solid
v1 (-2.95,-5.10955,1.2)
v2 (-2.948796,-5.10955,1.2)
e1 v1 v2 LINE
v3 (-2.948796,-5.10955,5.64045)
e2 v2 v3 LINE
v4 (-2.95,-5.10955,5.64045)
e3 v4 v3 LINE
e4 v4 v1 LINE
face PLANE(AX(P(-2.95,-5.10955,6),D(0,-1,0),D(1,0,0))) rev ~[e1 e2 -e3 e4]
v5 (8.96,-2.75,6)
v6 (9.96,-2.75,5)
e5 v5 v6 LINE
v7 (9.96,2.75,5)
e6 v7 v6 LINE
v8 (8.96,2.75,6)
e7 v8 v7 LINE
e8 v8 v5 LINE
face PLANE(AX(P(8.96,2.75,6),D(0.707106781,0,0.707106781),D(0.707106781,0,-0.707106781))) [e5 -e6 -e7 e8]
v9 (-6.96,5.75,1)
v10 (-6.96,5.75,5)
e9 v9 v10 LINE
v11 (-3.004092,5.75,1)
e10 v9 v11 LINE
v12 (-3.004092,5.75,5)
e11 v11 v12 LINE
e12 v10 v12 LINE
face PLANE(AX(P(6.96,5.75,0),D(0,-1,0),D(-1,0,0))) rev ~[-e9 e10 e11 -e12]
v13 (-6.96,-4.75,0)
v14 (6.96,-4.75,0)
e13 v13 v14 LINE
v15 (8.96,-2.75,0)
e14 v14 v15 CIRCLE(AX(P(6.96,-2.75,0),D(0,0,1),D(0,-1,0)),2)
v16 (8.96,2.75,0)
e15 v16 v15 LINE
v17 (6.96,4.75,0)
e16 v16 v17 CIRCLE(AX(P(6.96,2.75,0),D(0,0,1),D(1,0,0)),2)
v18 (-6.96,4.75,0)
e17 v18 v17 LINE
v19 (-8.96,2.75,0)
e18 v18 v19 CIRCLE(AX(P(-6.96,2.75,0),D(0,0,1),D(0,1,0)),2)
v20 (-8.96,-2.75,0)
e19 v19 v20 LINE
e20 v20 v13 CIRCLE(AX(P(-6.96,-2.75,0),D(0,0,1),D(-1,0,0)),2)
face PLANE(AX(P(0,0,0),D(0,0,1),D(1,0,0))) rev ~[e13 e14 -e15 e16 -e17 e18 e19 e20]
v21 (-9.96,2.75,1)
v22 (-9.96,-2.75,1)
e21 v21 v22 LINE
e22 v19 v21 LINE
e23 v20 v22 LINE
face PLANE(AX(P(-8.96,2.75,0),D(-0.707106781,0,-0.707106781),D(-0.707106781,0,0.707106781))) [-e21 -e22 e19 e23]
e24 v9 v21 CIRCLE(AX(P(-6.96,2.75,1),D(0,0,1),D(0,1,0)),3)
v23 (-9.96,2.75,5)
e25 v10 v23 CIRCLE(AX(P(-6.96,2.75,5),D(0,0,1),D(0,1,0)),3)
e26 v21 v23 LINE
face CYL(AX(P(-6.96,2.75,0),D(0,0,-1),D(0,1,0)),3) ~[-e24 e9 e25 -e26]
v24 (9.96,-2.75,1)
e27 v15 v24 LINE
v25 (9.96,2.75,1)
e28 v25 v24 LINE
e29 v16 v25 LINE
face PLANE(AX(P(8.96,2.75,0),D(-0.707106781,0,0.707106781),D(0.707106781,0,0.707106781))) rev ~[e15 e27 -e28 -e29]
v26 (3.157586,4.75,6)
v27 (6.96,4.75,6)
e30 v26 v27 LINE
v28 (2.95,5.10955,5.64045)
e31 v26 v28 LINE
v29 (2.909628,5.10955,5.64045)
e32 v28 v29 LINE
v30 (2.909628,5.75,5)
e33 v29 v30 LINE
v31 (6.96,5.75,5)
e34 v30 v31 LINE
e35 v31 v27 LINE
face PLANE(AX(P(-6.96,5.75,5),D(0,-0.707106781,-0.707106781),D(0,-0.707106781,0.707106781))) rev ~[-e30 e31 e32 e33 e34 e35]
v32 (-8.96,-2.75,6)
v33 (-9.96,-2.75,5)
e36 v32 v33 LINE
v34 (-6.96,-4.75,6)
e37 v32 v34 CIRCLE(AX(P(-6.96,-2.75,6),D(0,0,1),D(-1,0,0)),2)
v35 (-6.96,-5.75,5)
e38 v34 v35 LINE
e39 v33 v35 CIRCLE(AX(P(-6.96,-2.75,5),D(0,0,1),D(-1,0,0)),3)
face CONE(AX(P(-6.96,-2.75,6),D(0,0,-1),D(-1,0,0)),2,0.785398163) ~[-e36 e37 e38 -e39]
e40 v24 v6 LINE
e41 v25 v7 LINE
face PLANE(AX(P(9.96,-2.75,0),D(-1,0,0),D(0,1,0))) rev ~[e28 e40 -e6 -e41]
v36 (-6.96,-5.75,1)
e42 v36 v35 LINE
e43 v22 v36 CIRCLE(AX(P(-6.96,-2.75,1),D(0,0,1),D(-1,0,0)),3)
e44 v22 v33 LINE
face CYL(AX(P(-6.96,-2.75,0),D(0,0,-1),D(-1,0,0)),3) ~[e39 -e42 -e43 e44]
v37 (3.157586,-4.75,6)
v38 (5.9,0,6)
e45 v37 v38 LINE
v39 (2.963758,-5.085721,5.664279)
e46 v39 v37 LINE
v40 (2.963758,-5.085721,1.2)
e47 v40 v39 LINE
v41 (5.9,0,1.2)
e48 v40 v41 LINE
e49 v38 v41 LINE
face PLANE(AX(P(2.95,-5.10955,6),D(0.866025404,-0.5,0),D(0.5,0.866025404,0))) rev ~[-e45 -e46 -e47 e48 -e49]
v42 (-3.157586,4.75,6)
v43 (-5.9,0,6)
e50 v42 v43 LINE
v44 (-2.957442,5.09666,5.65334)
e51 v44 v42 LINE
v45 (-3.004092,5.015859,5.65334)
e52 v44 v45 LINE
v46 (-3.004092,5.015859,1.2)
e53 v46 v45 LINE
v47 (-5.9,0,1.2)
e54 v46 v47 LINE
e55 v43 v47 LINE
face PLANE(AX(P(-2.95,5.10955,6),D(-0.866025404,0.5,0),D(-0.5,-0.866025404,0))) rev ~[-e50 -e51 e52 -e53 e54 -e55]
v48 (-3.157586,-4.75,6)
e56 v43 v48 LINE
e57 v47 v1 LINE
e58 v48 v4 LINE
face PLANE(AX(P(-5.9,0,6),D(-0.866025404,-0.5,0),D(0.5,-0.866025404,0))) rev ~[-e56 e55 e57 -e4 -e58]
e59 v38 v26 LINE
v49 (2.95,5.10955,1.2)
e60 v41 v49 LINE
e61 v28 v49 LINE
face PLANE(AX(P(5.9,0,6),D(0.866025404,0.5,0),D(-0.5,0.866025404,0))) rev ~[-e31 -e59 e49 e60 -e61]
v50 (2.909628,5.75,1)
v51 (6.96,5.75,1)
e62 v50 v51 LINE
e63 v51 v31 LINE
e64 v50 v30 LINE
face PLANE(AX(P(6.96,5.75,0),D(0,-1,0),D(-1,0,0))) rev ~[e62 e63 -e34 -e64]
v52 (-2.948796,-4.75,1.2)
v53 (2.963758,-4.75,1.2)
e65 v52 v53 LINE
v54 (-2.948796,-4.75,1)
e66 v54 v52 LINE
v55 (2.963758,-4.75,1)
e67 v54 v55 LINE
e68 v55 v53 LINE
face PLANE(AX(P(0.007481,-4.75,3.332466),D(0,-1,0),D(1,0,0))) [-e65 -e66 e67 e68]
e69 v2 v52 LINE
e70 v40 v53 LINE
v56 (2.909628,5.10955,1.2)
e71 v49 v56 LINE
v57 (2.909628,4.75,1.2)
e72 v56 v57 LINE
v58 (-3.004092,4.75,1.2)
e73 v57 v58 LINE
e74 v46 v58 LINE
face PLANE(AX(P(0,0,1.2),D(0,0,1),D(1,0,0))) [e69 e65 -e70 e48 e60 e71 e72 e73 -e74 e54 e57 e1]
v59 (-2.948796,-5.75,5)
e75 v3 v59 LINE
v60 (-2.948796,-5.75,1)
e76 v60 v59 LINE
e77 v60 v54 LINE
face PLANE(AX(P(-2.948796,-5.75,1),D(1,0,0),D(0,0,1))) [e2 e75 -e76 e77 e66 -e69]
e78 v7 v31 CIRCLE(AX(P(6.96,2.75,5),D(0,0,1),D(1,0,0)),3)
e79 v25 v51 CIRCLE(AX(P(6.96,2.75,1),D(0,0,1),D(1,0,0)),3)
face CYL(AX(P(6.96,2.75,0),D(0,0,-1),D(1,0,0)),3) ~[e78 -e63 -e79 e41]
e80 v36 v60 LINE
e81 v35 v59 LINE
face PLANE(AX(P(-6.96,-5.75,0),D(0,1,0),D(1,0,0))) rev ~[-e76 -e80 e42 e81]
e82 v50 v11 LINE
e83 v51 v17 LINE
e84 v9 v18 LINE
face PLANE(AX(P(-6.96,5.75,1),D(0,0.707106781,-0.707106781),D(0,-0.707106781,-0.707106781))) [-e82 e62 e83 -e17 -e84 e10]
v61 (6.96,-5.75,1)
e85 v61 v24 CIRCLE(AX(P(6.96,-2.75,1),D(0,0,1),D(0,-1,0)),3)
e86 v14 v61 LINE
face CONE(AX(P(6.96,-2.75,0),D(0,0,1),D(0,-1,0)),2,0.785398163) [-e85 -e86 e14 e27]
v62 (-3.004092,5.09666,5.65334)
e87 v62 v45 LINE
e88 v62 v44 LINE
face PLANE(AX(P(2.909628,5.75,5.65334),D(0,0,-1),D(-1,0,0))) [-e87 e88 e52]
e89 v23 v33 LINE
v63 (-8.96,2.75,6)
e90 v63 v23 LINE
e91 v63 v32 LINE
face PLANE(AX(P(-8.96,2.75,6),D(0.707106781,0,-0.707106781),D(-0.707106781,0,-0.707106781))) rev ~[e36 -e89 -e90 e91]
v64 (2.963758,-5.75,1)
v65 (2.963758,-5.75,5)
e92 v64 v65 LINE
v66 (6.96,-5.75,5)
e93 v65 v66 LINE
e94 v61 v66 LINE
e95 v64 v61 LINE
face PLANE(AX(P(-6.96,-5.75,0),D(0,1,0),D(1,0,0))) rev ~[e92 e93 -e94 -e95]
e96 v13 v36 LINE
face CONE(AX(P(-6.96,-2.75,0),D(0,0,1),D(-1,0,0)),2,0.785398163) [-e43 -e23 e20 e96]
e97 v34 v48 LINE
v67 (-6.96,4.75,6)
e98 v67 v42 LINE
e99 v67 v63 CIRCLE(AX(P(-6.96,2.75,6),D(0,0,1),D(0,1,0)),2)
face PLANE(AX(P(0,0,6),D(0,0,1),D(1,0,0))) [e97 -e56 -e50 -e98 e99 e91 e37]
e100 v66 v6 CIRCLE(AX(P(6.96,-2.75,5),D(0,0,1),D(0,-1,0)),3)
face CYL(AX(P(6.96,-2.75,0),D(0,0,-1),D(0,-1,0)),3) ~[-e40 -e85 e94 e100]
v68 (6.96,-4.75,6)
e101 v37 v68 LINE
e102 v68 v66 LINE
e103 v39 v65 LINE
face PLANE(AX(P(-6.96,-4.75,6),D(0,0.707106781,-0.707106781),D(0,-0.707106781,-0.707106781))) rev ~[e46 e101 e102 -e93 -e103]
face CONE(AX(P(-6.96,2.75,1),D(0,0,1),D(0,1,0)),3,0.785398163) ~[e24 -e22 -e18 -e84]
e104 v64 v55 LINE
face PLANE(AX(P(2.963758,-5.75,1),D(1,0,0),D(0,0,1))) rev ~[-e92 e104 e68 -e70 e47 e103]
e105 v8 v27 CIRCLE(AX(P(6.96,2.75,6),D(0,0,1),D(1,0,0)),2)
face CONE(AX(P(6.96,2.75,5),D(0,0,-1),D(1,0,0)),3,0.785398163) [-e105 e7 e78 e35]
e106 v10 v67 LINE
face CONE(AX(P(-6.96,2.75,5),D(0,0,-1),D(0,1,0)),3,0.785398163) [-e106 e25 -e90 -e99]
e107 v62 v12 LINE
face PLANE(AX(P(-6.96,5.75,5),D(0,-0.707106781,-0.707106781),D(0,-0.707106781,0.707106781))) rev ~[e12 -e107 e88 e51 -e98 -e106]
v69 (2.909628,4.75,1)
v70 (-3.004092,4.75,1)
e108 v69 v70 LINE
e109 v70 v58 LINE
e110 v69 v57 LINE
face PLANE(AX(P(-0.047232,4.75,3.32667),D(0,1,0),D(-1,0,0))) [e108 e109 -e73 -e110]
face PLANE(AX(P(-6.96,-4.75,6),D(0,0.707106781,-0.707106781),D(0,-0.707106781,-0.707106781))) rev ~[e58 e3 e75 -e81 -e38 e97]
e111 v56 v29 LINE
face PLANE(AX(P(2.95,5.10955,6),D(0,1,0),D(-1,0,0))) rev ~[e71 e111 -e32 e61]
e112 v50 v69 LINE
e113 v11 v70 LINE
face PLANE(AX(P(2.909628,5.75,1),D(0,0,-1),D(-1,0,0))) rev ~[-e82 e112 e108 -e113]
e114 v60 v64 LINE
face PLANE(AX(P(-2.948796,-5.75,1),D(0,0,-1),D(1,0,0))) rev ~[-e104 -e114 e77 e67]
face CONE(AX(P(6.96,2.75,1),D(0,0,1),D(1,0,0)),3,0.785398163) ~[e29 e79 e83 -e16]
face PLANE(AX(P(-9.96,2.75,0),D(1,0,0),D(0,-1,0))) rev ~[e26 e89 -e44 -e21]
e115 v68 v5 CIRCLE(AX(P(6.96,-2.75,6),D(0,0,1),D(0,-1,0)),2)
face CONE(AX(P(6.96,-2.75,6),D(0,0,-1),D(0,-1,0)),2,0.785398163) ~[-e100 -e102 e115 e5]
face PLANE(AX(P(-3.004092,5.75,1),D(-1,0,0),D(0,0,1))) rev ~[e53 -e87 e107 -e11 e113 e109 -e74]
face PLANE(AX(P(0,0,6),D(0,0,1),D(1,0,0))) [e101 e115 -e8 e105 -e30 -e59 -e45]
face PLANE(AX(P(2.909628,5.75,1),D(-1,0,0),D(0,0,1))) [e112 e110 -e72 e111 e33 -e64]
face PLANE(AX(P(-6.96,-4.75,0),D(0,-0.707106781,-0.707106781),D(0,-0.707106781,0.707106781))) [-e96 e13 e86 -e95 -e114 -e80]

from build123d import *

# Parameters (mm, degrees)
F1_DEPTH     = 6
F3_DEPTH     = 4.8
F4_T1_DEPTH  = 13.92
F4_T3_DEPTH  = 5.5
F4_T6_ANGLE  = 90
F4_T8_ANGLE  = 90
F4_T10_ANGLE = 90
F4_T12_ANGLE = 90
F4_T14_ANGLE = 90
F4_T16_ANGLE = 90
F4_T18_ANGLE = 90
F4_T20_ANGLE = 90
F5_W         = 5.9125532862
F5_H         = 4.6649316102
F6_DEPTH     = 1
F7_W         = 5.9137202334
F7_H         = 4.6533403695
F8_DEPTH     = 1


# Not quite as in the source:
# - a fillet or chamfer that OpenCascade refuses, or shapes differently, is made with other operations: its cross-section is extruded or revolved along the edge and cut away or added


with BuildPart() as f1:
    # F0 (on Top) → F1 (new body)
    with BuildSketch(Plane.XY):
        with BuildLine():
            Line((6.96, 5.75), (-6.96, 5.75))
            ThreePointArc((-6.96, 5.75), (-9.0813203436, 4.8713203436), (-9.96, 2.75))
            Line((-9.96, 2.75), (-9.96, -2.75))
            ThreePointArc((-9.96, -2.75), (-9.0813203436, -4.8713203436), (-6.96, -5.75))
            Line((-6.96, -5.75), (6.96, -5.75))
            ThreePointArc((6.96, -5.75), (9.0813203436, -4.8713203436), (9.96, -2.75))
            Line((9.96, -2.75), (9.96, 2.75))
            ThreePointArc((9.96, 2.75), (9.0813203436, 4.8713203436), (6.96, 5.75))
        make_face()
    extrude(amount=F1_DEPTH)

    # F2 (on face) → F3 (cut)
    with BuildSketch(Plane.XY.offset(6)):
        Polygon((2.95, 5.1095498823), (-2.95, 5.1095498823), (-5.9, 0), (-2.95, -5.1095498823), (2.95, -5.1095498823), (5.9, 0), align=None)
    extrude(amount=-F3_DEPTH, mode=Mode.SUBTRACT)

    # F4: chamfer of 1 on 2 edges, made by hand

    # F4_s2 → F4_t1 (cut)
    with BuildSketch(Plane.YZ.offset(-6.96)):
        Polygon((5.75, 5), (4.75, 6), (5.75, 6), align=None)
        Polygon((5.75, 1), (4.75, 0), (5.75, 0), align=None)
        Polygon((-4.75, 0), (-5.75, 1), (-5.75, 0), align=None)
        Polygon((-4.75, 6), (-5.75, 5), (-5.75, 6), align=None)
    extrude(amount=F4_T1_DEPTH, mode=Mode.SUBTRACT)

    # F4_s4 → F4_t3 (cut)
    with BuildSketch(Plane.XZ.offset(-2.75)):
        Polygon((-8.96, 0), (-9.96, 1), (-9.96, 0), align=None)
        Polygon((8.96, 0), (9.96, 1), (9.96, 0), align=None)
        Polygon((-8.96, 6), (-9.96, 5), (-9.96, 6), align=None)
        Polygon((8.96, 6), (9.96, 5), (9.96, 6), align=None)
    extrude(amount=F4_T3_DEPTH, mode=Mode.SUBTRACT)

    # F4_s5 → F4_t6 (revolve, cut)
    with BuildSketch(Plane.XZ.offset(-2.75)):
        Polygon((9.96, 1), (8.96, 0), (9.96, 0), align=None)
    revolve(axis=Axis((6.96, 2.75, 0), (0, 0, 1)), revolution_arc=F4_T6_ANGLE, mode=Mode.SUBTRACT)

    # F4_s7 → F4_t8 (revolve, cut)
    with BuildSketch(Plane.YZ.offset(-6.96)):
        Polygon((5.75, 1), (4.75, 0), (5.75, 0), align=None)
    revolve(axis=Axis((-6.96, 2.75, 0), (0, 0, 1)), revolution_arc=F4_T8_ANGLE, mode=Mode.SUBTRACT)

    # F4_s9 → F4_t10 (revolve, cut)
    with BuildSketch(Plane.XZ.offset(2.75)):
        Polygon((-8.96, 0), (-9.96, 1), (-9.96, 0), align=None)
    revolve(axis=Axis((-6.96, -2.75, 0), (0, 0, 1)), revolution_arc=F4_T10_ANGLE, mode=Mode.SUBTRACT)

    # F4_s11 → F4_t12 (revolve, cut)
    with BuildSketch(Plane.YZ.offset(6.96)):
        Polygon((-4.75, 0), (-5.75, 1), (-5.75, 0), align=None)
    revolve(axis=Axis((6.96, -2.75, 0), (0, 0, 1)), revolution_arc=F4_T12_ANGLE, mode=Mode.SUBTRACT)

    # F4_s13 → F4_t14 (revolve, cut)
    with BuildSketch(Plane.XZ.offset(-2.75)):
        Polygon((9.96, 5), (8.96, 6), (9.96, 6), align=None)
    revolve(axis=Axis((6.96, 2.75, 6), (0, 0, 1)), revolution_arc=F4_T14_ANGLE, mode=Mode.SUBTRACT)

    # F4_s15 → F4_t16 (revolve, cut)
    with BuildSketch(Plane.YZ.offset(-6.96)):
        Polygon((5.75, 5), (4.75, 6), (5.75, 6), align=None)
    revolve(axis=Axis((-6.96, 2.75, 6), (0, 0, 1)), revolution_arc=F4_T16_ANGLE, mode=Mode.SUBTRACT)

    # F4_s17 → F4_t18 (revolve, cut)
    with BuildSketch(Plane.XZ.offset(2.75)):
        Polygon((-8.96, 6), (-9.96, 5), (-9.96, 6), align=None)
    revolve(axis=Axis((-6.96, -2.75, 6), (0, 0, 1)), revolution_arc=F4_T18_ANGLE, mode=Mode.SUBTRACT)

    # F4_s19 → F4_t20 (revolve, cut)
    with BuildSketch(Plane.YZ.offset(6.96)):
        Polygon((-4.75, 6), (-5.75, 5), (-5.75, 6), align=None)
    revolve(axis=Axis((6.96, -2.75, 6), (0, 0, 1)), revolution_arc=F4_T20_ANGLE, mode=Mode.SUBTRACT)

    # F5 (on face) → F6 (cut)
    with BuildSketch(Plane.XZ.offset(5.75)):
        with Locations((0.007480965, 3.3324658051)):
            Rectangle(F5_W, F5_H)
    extrude(amount=-F6_DEPTH, mode=Mode.SUBTRACT)

    # F7 (on face) → F8 (cut)
    with BuildSketch(Plane(origin=(0, 5.75, 0), x_dir=(-1, 0, 0), z_dir=(0, 1, 0))):
        with Locations((0.0472323736, 3.3266701847)):
            Rectangle(F7_W, F7_H)
    extrude(amount=-F8_DEPTH, mode=Mode.SUBTRACT)


solid = f1.part
